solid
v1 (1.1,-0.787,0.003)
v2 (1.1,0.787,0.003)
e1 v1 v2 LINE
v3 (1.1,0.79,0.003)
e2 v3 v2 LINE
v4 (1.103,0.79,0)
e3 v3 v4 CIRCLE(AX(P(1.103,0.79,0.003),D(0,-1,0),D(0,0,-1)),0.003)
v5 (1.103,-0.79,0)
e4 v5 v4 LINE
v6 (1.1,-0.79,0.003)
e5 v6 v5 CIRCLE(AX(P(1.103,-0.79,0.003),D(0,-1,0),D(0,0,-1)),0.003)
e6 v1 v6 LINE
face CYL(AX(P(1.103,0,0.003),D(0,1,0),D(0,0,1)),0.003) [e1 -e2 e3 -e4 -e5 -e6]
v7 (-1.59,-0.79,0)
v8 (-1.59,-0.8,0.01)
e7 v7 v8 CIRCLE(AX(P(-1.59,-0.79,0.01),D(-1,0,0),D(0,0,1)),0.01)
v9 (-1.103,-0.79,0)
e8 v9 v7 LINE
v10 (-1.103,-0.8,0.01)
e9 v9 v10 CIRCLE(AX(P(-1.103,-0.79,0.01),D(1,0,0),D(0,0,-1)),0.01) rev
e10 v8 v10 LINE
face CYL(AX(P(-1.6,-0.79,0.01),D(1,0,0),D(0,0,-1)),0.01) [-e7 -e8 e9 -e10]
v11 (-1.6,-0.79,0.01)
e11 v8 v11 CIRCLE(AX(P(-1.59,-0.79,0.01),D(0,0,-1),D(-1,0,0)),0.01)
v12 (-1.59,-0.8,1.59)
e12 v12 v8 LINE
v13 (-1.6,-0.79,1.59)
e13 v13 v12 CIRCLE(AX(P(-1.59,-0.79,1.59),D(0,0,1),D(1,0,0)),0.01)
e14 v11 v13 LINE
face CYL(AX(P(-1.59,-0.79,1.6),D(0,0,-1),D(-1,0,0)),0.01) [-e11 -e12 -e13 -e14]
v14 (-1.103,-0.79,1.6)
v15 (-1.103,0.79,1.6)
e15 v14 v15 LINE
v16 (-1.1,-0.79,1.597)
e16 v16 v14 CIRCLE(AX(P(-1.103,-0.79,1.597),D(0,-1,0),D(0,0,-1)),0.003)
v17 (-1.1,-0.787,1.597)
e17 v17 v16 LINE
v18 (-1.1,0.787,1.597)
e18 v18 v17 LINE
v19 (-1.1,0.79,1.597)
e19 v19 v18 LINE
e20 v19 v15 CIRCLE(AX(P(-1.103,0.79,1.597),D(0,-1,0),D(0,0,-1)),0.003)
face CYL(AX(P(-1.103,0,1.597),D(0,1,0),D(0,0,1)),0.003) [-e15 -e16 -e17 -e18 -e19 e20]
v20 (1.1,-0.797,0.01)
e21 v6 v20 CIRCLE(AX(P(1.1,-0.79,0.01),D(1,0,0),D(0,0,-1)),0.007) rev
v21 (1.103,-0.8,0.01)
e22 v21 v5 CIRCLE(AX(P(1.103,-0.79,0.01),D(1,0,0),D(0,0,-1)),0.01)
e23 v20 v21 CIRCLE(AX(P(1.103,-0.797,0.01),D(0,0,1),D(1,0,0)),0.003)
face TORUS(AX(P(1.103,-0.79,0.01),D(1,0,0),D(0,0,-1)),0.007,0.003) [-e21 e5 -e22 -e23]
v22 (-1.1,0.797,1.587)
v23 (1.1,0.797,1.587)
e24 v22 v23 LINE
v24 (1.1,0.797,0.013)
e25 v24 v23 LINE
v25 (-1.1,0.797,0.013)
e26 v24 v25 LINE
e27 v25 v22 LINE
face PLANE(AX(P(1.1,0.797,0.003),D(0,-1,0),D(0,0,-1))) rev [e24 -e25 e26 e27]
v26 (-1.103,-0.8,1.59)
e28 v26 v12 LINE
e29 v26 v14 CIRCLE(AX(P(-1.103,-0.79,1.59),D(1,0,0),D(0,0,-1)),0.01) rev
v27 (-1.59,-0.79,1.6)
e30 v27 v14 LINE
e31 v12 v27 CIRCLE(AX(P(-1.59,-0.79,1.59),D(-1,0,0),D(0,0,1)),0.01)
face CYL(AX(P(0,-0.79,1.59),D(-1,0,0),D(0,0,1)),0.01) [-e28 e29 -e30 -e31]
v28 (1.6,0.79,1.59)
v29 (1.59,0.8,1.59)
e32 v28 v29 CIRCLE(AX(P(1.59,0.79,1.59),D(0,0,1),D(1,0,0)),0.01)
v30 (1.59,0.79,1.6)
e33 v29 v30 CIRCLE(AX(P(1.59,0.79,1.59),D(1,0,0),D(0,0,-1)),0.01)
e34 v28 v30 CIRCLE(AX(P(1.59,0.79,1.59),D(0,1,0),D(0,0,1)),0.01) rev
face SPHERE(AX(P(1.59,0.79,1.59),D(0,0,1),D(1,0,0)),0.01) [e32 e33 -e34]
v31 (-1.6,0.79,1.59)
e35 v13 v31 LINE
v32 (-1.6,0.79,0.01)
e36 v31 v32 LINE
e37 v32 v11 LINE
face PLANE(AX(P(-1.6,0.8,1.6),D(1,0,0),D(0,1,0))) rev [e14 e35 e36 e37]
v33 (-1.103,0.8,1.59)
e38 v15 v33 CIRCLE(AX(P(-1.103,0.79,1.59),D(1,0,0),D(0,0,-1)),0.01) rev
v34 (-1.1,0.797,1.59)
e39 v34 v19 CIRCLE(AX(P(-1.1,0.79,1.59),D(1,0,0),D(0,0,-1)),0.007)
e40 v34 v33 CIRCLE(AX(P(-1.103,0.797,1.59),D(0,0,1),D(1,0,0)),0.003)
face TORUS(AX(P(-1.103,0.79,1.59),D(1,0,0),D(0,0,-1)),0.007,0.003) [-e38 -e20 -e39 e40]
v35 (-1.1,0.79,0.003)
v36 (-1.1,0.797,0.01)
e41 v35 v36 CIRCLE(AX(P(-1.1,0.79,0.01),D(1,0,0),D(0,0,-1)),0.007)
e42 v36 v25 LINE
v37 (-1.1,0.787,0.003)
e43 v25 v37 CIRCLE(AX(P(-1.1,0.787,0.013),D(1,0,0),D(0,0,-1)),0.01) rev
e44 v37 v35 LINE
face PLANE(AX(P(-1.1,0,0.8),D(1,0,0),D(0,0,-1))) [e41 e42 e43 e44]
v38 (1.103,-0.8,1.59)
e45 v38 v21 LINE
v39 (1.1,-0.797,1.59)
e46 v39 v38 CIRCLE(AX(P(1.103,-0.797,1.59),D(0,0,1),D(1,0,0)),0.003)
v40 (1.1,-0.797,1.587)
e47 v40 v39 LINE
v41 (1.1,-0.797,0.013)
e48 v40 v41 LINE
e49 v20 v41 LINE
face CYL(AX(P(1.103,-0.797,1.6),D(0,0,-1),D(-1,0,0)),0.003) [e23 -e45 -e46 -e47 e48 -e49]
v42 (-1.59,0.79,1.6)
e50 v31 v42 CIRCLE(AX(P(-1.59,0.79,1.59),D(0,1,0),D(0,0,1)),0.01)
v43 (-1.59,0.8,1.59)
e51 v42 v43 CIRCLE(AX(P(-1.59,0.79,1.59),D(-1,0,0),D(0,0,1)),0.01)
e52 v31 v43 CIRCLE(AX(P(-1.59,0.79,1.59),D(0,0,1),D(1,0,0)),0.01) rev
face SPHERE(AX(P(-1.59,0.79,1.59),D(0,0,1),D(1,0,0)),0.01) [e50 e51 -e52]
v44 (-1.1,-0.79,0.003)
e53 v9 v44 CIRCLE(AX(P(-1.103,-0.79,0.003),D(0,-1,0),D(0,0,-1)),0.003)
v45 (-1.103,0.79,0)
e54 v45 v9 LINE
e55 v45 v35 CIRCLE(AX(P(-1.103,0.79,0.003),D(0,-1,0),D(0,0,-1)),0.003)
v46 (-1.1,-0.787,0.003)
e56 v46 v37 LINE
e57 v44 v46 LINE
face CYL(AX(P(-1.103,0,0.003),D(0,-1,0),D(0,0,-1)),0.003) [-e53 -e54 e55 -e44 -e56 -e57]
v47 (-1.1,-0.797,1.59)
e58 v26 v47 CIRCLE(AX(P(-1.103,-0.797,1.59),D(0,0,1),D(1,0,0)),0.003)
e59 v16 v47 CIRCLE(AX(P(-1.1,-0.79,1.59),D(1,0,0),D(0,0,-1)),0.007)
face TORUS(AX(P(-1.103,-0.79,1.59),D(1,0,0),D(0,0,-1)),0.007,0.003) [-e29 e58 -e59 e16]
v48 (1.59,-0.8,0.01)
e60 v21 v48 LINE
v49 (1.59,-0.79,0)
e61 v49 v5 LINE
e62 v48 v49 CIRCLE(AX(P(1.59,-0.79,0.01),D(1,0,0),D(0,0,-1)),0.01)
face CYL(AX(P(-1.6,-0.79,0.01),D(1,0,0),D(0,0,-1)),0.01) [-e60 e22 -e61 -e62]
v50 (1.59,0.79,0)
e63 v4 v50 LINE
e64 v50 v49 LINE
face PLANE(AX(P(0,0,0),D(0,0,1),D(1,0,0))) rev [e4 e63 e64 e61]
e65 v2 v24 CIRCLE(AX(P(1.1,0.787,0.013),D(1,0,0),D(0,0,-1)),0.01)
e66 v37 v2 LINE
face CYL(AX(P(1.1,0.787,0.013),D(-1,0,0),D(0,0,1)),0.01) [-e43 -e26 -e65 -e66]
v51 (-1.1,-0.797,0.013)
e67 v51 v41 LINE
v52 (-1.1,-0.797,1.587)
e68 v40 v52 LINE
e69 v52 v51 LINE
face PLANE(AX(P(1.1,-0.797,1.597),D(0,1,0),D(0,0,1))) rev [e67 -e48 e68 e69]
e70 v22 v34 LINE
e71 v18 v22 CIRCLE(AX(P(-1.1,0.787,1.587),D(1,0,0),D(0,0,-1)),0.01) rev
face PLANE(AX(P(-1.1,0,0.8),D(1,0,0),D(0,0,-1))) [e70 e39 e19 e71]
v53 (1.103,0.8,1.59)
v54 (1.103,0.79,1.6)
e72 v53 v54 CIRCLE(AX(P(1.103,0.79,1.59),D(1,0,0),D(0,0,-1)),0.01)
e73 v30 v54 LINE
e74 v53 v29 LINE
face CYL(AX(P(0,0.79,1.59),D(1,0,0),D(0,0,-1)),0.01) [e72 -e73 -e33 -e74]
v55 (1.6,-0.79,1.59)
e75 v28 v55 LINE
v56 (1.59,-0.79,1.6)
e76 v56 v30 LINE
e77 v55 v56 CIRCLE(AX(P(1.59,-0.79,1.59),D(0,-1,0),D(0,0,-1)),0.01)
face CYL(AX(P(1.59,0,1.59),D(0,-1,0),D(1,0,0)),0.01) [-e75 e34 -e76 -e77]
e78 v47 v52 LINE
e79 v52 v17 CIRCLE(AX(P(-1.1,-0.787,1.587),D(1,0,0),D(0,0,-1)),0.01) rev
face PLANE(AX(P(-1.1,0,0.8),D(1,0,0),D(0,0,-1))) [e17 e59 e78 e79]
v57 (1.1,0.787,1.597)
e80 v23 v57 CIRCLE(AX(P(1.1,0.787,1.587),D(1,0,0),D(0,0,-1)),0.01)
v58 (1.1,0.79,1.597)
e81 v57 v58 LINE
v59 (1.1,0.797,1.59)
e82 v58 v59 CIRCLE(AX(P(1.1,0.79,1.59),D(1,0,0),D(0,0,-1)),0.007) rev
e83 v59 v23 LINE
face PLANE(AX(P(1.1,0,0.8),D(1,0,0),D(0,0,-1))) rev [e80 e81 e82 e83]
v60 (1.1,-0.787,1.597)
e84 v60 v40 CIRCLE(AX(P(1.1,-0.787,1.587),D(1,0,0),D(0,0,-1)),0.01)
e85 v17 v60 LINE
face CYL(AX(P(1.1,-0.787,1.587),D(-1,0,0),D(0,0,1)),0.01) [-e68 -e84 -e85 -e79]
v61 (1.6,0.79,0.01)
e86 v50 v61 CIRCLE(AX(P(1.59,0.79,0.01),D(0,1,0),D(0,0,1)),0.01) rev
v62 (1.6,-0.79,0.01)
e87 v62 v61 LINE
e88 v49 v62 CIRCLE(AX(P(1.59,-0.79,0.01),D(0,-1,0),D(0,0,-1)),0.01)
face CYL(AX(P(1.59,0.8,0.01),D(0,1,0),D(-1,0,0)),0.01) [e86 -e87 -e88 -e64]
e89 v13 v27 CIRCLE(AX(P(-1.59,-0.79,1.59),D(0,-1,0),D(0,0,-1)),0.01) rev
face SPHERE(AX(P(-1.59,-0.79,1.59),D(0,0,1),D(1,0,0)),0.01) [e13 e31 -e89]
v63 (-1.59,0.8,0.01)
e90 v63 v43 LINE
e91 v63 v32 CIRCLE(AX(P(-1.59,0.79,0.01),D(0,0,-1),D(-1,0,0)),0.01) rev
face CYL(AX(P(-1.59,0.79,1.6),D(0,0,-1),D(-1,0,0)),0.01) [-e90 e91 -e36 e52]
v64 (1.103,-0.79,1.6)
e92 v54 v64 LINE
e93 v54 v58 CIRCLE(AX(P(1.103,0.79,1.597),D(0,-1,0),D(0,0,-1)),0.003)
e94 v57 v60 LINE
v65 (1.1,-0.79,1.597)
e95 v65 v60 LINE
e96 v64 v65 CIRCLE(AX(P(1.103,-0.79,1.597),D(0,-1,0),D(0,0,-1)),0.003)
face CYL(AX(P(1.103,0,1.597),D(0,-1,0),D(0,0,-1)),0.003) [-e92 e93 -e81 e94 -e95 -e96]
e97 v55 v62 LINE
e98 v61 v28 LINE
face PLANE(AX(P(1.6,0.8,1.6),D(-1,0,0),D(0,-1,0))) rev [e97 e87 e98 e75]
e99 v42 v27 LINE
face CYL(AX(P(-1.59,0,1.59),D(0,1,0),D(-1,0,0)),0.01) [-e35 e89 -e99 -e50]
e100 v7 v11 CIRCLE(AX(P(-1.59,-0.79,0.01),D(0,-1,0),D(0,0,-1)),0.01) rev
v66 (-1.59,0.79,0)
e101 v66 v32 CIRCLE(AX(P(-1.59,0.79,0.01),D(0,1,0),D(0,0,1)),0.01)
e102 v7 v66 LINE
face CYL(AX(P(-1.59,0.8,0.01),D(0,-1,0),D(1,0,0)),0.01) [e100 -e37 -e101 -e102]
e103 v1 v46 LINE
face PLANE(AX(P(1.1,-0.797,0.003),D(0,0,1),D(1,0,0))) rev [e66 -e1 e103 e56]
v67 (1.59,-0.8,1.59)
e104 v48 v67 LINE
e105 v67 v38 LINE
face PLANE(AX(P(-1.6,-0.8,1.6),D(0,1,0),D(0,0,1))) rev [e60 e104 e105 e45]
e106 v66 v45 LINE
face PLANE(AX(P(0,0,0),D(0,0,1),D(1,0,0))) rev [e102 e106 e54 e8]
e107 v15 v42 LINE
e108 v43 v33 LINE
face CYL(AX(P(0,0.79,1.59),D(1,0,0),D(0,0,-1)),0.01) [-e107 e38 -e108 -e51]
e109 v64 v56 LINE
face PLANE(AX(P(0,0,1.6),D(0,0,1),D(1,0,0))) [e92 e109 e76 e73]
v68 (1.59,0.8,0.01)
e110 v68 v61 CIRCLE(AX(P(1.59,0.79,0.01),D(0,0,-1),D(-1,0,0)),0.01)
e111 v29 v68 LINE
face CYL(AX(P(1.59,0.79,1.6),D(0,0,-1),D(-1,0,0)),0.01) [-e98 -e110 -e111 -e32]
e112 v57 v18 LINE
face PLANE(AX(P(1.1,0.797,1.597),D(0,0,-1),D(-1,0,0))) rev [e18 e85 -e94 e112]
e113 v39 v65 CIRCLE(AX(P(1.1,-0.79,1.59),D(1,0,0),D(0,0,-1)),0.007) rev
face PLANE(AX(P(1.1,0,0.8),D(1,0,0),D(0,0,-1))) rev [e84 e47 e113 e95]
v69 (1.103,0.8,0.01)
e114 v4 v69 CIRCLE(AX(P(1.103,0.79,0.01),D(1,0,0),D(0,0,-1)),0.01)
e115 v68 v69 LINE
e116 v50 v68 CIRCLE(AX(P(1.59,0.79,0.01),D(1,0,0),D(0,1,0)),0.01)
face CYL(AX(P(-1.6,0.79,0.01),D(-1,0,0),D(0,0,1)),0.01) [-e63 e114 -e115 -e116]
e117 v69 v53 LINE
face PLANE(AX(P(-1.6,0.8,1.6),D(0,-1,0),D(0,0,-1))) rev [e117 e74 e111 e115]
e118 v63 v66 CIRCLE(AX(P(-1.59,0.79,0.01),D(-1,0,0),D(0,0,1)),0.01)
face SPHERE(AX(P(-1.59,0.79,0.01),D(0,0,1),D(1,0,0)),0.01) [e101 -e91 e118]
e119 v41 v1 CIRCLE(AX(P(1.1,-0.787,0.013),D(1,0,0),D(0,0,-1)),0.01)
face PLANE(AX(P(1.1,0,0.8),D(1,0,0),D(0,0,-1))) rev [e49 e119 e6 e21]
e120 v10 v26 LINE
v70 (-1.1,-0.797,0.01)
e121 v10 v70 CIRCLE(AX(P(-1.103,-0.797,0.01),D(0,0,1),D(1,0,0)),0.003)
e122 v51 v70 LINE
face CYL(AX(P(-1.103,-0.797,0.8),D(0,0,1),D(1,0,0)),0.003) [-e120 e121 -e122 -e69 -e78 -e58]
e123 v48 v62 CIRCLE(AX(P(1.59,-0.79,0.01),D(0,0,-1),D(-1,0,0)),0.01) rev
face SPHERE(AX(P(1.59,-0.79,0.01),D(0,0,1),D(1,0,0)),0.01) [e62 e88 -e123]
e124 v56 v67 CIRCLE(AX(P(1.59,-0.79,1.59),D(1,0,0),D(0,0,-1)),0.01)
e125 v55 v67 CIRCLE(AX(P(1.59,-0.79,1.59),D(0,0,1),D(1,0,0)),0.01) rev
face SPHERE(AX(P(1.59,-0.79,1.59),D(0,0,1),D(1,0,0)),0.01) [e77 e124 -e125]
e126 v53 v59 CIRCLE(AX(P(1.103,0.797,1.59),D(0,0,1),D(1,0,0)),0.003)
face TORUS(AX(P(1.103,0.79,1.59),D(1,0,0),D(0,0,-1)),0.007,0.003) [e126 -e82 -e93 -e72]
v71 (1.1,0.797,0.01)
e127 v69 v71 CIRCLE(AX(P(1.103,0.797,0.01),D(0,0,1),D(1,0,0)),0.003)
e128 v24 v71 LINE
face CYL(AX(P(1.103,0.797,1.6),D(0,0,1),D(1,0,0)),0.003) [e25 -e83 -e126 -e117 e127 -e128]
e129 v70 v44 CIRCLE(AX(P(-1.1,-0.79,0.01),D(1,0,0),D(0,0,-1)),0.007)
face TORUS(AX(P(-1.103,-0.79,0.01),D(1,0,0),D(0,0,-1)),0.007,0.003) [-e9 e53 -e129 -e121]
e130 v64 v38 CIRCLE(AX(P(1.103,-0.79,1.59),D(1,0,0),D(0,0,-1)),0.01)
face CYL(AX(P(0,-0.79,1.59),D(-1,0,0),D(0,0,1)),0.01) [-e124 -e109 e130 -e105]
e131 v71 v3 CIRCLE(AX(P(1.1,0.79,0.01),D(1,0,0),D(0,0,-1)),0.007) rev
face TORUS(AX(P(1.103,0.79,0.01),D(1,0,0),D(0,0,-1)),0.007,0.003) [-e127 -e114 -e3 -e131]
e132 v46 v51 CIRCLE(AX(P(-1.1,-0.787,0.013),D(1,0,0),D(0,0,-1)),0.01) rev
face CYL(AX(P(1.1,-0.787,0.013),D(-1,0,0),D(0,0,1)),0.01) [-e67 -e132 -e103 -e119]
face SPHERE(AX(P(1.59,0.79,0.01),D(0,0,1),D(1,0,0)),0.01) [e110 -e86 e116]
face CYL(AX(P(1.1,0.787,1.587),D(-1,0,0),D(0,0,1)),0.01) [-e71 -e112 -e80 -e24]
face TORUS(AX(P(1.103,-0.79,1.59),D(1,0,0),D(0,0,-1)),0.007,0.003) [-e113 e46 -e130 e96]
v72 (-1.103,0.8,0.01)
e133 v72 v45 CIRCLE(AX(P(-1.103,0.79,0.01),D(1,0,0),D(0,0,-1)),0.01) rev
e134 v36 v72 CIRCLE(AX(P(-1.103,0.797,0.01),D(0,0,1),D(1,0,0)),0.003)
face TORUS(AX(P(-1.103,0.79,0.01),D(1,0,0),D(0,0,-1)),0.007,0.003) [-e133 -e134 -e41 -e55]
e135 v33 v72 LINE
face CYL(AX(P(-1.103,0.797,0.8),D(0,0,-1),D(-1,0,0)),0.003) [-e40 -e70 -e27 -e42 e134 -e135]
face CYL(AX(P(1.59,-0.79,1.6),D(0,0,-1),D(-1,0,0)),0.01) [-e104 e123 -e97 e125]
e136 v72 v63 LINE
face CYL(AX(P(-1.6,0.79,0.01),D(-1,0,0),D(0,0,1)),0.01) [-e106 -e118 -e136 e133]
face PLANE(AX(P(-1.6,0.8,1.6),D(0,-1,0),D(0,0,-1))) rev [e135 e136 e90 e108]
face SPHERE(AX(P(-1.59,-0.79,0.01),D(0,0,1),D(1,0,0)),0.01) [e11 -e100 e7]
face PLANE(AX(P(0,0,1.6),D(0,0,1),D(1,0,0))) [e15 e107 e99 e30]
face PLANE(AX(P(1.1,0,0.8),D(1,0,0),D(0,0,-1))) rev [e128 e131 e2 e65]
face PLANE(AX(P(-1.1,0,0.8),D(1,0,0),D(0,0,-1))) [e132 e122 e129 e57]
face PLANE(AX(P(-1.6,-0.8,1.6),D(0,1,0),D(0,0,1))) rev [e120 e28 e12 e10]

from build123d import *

# Parameters (mm, degrees)
SKETCH1_W                           = 3.2
SKETCH1_H                           = 1.6
ALL_BODY_DEPTH                      = 1.6
CUT_OUT_THE_BODY_FOR_PIN_DEPTH      = 1.1
CUT_OUT_THE_BODY_FOR_PIN_DEPTH_BACK = 1.1
SKETCH2_OUTSIDE_W                   = 4.384
SKETCH2_OUTSIDE_H                   = 4.384
SKETCH2_OUTSIDE_W_2                 = 1.594
SKETCH2_OUTSIDE_H_2                 = 1.594
BODY_FILLET_R                       = 0.01
PIN_FILLET_A_R                      = 0.01
PIN_FILLET_B_R                      = 0.003


with BuildPart() as part:
    # Sketch1 → All body (new body)
    with BuildSketch(Plane.XY):
        Rectangle(SKETCH1_W, SKETCH1_H)
    extrude(amount=ALL_BODY_DEPTH)

    # Sketch2 outside → Cut out the body for pin (cut, two sides: drawn at the far end of the back side and taken through both)
    with BuildSketch(Plane(origin=(0, 0, 0), x_dir=(0, 0, -1), z_dir=(1, 0, 0)).offset(-CUT_OUT_THE_BODY_FOR_PIN_DEPTH_BACK)):
        with Locations((-0.8, 0)):
            Rectangle(SKETCH2_OUTSIDE_W, SKETCH2_OUTSIDE_H)
        with Locations((-0.8, 0)):
            Rectangle(SKETCH2_OUTSIDE_W_2, SKETCH2_OUTSIDE_H_2, mode=Mode.SUBTRACT)
    extrude(amount=CUT_OUT_THE_BODY_FOR_PIN_DEPTH + CUT_OUT_THE_BODY_FOR_PIN_DEPTH_BACK, mode=Mode.SUBTRACT)

    # Body fillet
    body_fillet_edges = [part.edges().sort_by_distance(p)[0] for p in [
        (0, 0.797, 0.003),
        (0, 0.797, 1.597),
        (0, -0.797, 1.597),
        (0, -0.797, 0.003),
    ]]
    fillet(body_fillet_edges, radius=BODY_FILLET_R)

    # Pin fillet a
    pin_fillet_a_edges = [part.edges().sort_by_distance(p)[0] for p in [
        (1.6, 0, 1.6),
        (-1.35, 0.8, 0),
        (1.35, -0.8, 0),
        (1.35, -0.8, 1.6),
        (-1.35, 0.8, 1.6),
        (1.35, 0.8, 1.6),
        (-1.6, 0, 1.6),
        (1.35, 0.8, 0),
        (1.6, 0, 0),
        (-1.35, -0.8, 0),
        (-1.6, 0, 0),
        (-1.6, 0.8, 0.8),
        (1.6, 0.8, 0.8),
        (1.6, -0.8, 0.8),
        (-1.6, -0.8, 0.8),
        (-1.35, -0.8, 1.6),
    ]]
    fillet(pin_fillet_a_edges, radius=PIN_FILLET_A_R)

    # Pin fillet b
    pin_fillet_b_edges = [part.edges().sort_by_distance(p)[0] for p in [
        (1.1, -0.8, 0.8),
        (1.1, 0, 1.6),
        (1.1, 0.8, 0.8),
        (1.1, 0, 0),
        (-1.1, 0.8, 0.8),
        (-1.1, 0, 1.6),
        (-1.1, -0.8, 0.8),
        (-1.1, 0, 0),
        (1.1, 0.797071068, 0.002928932),
        (1.1, -0.797071068, 0.002928932),
        (1.1, -0.797071068, 1.597071068),
        (1.1, 0.797071068, 1.597071068),
        (-1.1, -0.797071068, 1.597071068),
        (-1.1, 0.797071068, 1.597071068),
        (-1.1, -0.797071068, 0.002928932),
        (-1.1, 0.797071068, 0.002928932),
    ]]
    fillet(pin_fillet_b_edges, radius=PIN_FILLET_B_R - 0.0001)  # a hair under: the kernel refuses the full size


solid = part.part
